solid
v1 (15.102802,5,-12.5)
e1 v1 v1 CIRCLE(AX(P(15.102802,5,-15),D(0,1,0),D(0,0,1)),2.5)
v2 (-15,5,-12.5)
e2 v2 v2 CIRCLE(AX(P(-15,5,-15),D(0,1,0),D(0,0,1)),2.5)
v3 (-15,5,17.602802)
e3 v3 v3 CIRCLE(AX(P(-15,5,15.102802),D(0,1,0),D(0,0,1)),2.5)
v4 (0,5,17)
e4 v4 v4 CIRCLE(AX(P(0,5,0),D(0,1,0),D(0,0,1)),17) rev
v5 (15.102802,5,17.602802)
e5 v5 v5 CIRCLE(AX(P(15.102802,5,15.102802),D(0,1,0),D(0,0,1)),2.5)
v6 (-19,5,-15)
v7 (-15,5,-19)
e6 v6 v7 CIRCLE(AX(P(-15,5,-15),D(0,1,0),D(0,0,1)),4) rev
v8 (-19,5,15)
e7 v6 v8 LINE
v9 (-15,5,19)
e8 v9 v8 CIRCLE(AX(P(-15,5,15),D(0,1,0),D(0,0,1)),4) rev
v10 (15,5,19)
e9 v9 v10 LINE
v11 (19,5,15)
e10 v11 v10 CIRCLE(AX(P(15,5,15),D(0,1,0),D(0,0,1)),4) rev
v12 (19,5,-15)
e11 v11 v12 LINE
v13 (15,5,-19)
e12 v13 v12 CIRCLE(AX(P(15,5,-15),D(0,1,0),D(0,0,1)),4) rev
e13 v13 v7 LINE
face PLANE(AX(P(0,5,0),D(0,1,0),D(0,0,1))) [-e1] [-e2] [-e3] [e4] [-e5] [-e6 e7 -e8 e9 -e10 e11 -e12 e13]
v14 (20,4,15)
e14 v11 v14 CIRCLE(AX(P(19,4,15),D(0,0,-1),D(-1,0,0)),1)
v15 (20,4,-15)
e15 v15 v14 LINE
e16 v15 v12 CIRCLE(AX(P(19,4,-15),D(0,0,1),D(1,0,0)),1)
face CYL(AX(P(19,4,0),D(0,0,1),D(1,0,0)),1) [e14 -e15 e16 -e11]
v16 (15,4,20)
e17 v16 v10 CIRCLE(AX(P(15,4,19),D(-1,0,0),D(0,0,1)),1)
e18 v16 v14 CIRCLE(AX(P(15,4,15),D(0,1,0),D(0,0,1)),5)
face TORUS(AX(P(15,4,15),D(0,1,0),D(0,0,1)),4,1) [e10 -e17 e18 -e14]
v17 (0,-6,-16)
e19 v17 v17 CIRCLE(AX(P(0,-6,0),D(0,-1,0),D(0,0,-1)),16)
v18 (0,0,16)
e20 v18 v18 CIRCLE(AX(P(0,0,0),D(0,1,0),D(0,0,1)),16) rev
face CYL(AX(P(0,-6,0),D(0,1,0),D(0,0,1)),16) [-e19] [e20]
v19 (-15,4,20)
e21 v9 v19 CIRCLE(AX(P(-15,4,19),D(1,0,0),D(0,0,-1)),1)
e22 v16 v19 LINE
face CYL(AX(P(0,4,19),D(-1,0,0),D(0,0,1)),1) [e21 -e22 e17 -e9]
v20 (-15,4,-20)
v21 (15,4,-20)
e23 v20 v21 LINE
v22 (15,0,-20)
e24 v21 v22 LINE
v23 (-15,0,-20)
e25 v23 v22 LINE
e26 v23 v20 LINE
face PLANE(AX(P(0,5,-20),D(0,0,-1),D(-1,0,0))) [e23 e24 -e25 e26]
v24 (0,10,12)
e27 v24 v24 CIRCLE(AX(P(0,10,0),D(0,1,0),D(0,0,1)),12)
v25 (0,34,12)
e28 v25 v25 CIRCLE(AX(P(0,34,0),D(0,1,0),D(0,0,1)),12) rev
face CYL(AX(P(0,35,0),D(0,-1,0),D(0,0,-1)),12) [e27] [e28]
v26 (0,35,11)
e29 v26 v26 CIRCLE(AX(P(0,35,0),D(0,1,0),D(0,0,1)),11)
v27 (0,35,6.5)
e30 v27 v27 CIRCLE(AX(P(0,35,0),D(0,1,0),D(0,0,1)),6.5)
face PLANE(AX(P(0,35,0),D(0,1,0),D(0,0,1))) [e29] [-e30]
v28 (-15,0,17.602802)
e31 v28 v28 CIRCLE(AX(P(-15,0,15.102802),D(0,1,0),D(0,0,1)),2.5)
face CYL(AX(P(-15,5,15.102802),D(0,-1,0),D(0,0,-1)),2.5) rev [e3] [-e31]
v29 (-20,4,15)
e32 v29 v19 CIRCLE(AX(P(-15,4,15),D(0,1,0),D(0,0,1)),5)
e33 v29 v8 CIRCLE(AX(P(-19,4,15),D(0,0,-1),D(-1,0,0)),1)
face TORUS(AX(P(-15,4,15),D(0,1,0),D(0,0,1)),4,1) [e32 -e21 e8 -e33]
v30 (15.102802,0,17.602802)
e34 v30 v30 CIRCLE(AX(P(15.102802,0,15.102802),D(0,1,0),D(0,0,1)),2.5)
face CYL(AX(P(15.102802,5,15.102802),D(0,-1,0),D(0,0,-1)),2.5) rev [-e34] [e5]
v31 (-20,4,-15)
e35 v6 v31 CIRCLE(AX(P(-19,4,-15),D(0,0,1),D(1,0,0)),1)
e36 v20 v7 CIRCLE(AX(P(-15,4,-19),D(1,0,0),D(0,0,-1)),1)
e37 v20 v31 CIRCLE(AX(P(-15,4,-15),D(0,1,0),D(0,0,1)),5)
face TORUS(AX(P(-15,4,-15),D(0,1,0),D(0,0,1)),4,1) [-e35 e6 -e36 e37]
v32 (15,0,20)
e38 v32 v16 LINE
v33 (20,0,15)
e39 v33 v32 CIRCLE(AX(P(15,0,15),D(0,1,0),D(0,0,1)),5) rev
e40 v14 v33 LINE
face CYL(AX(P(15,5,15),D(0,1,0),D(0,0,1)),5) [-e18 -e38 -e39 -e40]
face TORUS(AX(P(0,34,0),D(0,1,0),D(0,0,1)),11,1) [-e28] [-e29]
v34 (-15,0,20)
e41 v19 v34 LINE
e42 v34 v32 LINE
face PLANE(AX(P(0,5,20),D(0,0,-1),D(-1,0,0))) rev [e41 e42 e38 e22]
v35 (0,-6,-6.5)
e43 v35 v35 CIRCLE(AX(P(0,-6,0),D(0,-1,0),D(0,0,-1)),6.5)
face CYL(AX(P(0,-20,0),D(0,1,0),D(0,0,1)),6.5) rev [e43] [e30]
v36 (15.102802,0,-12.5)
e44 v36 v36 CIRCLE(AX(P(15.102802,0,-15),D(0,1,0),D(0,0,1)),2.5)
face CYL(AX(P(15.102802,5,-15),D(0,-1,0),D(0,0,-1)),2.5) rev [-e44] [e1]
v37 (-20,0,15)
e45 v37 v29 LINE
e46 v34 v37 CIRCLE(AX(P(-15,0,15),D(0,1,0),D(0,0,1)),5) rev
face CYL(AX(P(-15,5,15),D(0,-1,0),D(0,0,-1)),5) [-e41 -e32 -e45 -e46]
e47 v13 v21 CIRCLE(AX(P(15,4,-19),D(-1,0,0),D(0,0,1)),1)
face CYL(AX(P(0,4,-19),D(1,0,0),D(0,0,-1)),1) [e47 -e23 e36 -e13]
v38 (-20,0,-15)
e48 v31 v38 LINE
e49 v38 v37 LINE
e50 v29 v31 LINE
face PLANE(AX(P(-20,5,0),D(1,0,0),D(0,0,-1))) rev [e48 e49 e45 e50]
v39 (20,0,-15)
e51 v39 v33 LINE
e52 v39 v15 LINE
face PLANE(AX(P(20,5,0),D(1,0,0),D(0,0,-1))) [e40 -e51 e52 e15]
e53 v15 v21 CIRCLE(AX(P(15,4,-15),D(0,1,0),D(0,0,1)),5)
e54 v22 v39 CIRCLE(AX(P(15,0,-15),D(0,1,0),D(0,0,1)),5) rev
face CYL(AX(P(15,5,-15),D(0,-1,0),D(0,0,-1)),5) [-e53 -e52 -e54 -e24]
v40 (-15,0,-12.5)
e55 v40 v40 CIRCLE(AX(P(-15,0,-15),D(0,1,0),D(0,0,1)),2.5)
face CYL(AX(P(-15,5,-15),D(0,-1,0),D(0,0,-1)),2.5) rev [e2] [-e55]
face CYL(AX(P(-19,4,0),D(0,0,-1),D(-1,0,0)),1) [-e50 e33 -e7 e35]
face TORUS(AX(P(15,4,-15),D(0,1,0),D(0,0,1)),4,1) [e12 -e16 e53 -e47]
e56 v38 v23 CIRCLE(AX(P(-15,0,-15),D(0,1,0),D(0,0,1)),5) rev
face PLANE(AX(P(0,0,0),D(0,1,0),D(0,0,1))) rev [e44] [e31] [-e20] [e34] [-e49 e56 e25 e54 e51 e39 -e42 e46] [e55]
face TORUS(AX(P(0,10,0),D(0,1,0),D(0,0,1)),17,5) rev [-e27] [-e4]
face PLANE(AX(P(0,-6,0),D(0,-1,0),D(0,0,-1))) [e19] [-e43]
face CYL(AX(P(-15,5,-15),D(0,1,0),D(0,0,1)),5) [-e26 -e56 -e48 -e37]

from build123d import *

# Parameters (mm, degrees)
BOSS_EXTRUDE13_OUTLINE_W = 40
BOSS_EXTRUDE13_OUTLINE_H = 40
BOSS_EXTRUDE13_OUTLINE_R = 2.5
BOSS_EXTRUDE13_DEPTH     = 5
SKETCH3_R                = 12
BOSS_EXTRUDE17_DEPTH     = 30
FILLET2_R                = 1
FILLET3_R                = 5
FILLET4_R                = 1
SKETCH6_R                = 16
BOSS_EXTRUDE18_DEPTH     = 6
SKETCH5_R                = 6.5
CUT_EXTRUDE2_DEPTH       = 55


# Read off the part's stored shape, not the designer's step: Boss-Extrude13
with BuildPart() as part:
    # Boss-Extrude13 outline → Boss-Extrude13 (new body)
    with BuildSketch(Plane(origin=(0, 0, 0), x_dir=(1, 0, 0), z_dir=(0, 1, 0))):
        Rectangle(BOSS_EXTRUDE13_OUTLINE_W, BOSS_EXTRUDE13_OUTLINE_H)
        with Locations((-15, -15.102802021)):
            Circle(BOSS_EXTRUDE13_OUTLINE_R, mode=Mode.SUBTRACT)
        with Locations((15.102802021, -15.102802021)):
            Circle(BOSS_EXTRUDE13_OUTLINE_R, mode=Mode.SUBTRACT)
        with Locations((-15, 15)):
            Circle(BOSS_EXTRUDE13_OUTLINE_R, mode=Mode.SUBTRACT)
        with Locations((15.102802021, 15)):
            Circle(BOSS_EXTRUDE13_OUTLINE_R, mode=Mode.SUBTRACT)
    extrude(amount=BOSS_EXTRUDE13_DEPTH)

    # Sketch3 → Boss-Extrude17 (add)
    with BuildSketch(Plane(origin=(0, 5, 0), x_dir=(1, 0, 0), z_dir=(0, 1, 0))):
        with Locations(Location((0, 0, 0), (0, 0, 270))):
            Circle(SKETCH3_R)
    extrude(amount=BOSS_EXTRUDE17_DEPTH)

    # Fillet2
    fillet2_edges = [part.edges().sort_by_distance(p)[0] for p in [
        (20, 5, 0),
        (0, 5, -20),
        (-20, 5, 0),
        (0, 5, 20),
    ]]
    fillet(fillet2_edges, radius=FILLET2_R)

    # Fillet3
    # the kernel refuses this fillet: 5 mm, written as the material it adds along each edge
    with BuildSketch(Plane(origin=(0, 5, 0), x_dir=(0, 0, 1), z_dir=(-1, 0, 0))) as fillet3_piece_1:
        with BuildLine():
            CenterArc((12 + FILLET3_R, FILLET3_R), FILLET3_R, 180, 90)
            Line((12, FILLET3_R), (12, 0))
            Line((12, 0), (12 + FILLET3_R, 0))
        make_face()
    revolve(axis=Axis((0, 5, 0), (0, 1, 0)))
    # the kernel refuses this fillet: 5 mm, written as the material it takes off along each edge
    with BuildSketch(Plane(origin=(-15, 5, -15), x_dir=(0, 0, -1), z_dir=(1, 0, 0))) as fillet3_2_piece_1:
        with BuildLine():
            CenterArc((4, -1), 1, 0, 90)
            Line((5, -1), (5, 0))
            Line((5, 0), (4, 0))
        make_face()
    revolve(axis=Axis((-15, 5, -15), (0, 1, 0)), revolution_arc=90, mode=Mode.SUBTRACT)
    with BuildSketch(Plane(origin=(15, 5, -15), x_dir=(1, 0, 0), z_dir=(0, 0, 1))) as fillet3_2_piece_2:
        with BuildLine():
            CenterArc((4, -1), 1, 0, 90)
            Line((5, -1), (5, 0))
            Line((5, 0), (4, 0))
        make_face()
    revolve(axis=Axis((15, 5, -15), (0, 1, 0)), revolution_arc=90, mode=Mode.SUBTRACT)
    with BuildSketch(Plane(origin=(-15, 5, 15), x_dir=(-1, 0, 0), z_dir=(0, 0, -1))) as fillet3_2_piece_3:
        with BuildLine():
            CenterArc((4, -1), 1, 0, 90)
            Line((5, -1), (5, 0))
            Line((5, 0), (4, 0))
        make_face()
    revolve(axis=Axis((-15, 5, 15), (0, 1, 0)), revolution_arc=90, mode=Mode.SUBTRACT)
    with BuildSketch(Plane(origin=(15, 5, 15), x_dir=(0, 0, 1), z_dir=(-1, 0, 0))) as fillet3_2_piece_4:
        with BuildLine():
            CenterArc((4, -1), 1, 0, 90)
            Line((5, -1), (5, 0))
            Line((5, 0), (4, 0))
        make_face()
    revolve(axis=Axis((15, 5, 15), (0, 1, 0)), revolution_arc=90, mode=Mode.SUBTRACT)
    with BuildSketch(Plane(origin=(20, -12.5, 20), x_dir=(-1, 0, 0), z_dir=(0, 1, 0)), Plane(origin=(20, -12.5, -20), x_dir=(0, 0, 1), z_dir=(0, 1, 0))) as fillet3_2_piece_5:
        with BuildLine():
            CenterArc((FILLET3_R, -FILLET3_R), FILLET3_R, 90, 90)
            Line((0, -FILLET3_R), (0, 0))
            Line((0, 0), (FILLET3_R, 0))
        make_face()
    extrude(amount=17.5, mode=Mode.SUBTRACT)
    with BuildSketch(Plane(origin=(-20, -12.5, 20), x_dir=(1, 0, 0), z_dir=(0, 1, 0)), Plane(origin=(-20, -12.5, -20), x_dir=(0, 0, 1), z_dir=(0, 1, 0))) as fillet3_2_piece_6:
        with BuildLine():
            CenterArc((FILLET3_R, FILLET3_R), FILLET3_R, 180, 90)
            Line((0, FILLET3_R), (0, 0))
            Line((0, 0), (FILLET3_R, 0))
        make_face()
    extrude(amount=17.5, mode=Mode.SUBTRACT)

    # Fillet4
    fillet4_edges = [part.edges().sort_by_distance(p)[0] for p in [
        (0, 35, -12),
    ]]
    fillet(fillet4_edges, radius=FILLET4_R)

    # Sketch6 → Boss-Extrude18 (add)
    with BuildSketch(Plane.XZ):
        with Locations(Location((0, 0, 0), (0, 0, 90))):
            Circle(SKETCH6_R)
    extrude(amount=BOSS_EXTRUDE18_DEPTH)

    # Sketch5 → Cut-Extrude2 (cut)
    with BuildSketch(Plane(origin=(0, 35, 0), x_dir=(1, 0, 0), z_dir=(0, 1, 0))):
        with Locations(Location((0, 0, 0), (0, 0, 270))):
            Circle(SKETCH5_R)
    extrude(amount=-CUT_EXTRUDE2_DEPTH, mode=Mode.SUBTRACT)


solid = part.part
